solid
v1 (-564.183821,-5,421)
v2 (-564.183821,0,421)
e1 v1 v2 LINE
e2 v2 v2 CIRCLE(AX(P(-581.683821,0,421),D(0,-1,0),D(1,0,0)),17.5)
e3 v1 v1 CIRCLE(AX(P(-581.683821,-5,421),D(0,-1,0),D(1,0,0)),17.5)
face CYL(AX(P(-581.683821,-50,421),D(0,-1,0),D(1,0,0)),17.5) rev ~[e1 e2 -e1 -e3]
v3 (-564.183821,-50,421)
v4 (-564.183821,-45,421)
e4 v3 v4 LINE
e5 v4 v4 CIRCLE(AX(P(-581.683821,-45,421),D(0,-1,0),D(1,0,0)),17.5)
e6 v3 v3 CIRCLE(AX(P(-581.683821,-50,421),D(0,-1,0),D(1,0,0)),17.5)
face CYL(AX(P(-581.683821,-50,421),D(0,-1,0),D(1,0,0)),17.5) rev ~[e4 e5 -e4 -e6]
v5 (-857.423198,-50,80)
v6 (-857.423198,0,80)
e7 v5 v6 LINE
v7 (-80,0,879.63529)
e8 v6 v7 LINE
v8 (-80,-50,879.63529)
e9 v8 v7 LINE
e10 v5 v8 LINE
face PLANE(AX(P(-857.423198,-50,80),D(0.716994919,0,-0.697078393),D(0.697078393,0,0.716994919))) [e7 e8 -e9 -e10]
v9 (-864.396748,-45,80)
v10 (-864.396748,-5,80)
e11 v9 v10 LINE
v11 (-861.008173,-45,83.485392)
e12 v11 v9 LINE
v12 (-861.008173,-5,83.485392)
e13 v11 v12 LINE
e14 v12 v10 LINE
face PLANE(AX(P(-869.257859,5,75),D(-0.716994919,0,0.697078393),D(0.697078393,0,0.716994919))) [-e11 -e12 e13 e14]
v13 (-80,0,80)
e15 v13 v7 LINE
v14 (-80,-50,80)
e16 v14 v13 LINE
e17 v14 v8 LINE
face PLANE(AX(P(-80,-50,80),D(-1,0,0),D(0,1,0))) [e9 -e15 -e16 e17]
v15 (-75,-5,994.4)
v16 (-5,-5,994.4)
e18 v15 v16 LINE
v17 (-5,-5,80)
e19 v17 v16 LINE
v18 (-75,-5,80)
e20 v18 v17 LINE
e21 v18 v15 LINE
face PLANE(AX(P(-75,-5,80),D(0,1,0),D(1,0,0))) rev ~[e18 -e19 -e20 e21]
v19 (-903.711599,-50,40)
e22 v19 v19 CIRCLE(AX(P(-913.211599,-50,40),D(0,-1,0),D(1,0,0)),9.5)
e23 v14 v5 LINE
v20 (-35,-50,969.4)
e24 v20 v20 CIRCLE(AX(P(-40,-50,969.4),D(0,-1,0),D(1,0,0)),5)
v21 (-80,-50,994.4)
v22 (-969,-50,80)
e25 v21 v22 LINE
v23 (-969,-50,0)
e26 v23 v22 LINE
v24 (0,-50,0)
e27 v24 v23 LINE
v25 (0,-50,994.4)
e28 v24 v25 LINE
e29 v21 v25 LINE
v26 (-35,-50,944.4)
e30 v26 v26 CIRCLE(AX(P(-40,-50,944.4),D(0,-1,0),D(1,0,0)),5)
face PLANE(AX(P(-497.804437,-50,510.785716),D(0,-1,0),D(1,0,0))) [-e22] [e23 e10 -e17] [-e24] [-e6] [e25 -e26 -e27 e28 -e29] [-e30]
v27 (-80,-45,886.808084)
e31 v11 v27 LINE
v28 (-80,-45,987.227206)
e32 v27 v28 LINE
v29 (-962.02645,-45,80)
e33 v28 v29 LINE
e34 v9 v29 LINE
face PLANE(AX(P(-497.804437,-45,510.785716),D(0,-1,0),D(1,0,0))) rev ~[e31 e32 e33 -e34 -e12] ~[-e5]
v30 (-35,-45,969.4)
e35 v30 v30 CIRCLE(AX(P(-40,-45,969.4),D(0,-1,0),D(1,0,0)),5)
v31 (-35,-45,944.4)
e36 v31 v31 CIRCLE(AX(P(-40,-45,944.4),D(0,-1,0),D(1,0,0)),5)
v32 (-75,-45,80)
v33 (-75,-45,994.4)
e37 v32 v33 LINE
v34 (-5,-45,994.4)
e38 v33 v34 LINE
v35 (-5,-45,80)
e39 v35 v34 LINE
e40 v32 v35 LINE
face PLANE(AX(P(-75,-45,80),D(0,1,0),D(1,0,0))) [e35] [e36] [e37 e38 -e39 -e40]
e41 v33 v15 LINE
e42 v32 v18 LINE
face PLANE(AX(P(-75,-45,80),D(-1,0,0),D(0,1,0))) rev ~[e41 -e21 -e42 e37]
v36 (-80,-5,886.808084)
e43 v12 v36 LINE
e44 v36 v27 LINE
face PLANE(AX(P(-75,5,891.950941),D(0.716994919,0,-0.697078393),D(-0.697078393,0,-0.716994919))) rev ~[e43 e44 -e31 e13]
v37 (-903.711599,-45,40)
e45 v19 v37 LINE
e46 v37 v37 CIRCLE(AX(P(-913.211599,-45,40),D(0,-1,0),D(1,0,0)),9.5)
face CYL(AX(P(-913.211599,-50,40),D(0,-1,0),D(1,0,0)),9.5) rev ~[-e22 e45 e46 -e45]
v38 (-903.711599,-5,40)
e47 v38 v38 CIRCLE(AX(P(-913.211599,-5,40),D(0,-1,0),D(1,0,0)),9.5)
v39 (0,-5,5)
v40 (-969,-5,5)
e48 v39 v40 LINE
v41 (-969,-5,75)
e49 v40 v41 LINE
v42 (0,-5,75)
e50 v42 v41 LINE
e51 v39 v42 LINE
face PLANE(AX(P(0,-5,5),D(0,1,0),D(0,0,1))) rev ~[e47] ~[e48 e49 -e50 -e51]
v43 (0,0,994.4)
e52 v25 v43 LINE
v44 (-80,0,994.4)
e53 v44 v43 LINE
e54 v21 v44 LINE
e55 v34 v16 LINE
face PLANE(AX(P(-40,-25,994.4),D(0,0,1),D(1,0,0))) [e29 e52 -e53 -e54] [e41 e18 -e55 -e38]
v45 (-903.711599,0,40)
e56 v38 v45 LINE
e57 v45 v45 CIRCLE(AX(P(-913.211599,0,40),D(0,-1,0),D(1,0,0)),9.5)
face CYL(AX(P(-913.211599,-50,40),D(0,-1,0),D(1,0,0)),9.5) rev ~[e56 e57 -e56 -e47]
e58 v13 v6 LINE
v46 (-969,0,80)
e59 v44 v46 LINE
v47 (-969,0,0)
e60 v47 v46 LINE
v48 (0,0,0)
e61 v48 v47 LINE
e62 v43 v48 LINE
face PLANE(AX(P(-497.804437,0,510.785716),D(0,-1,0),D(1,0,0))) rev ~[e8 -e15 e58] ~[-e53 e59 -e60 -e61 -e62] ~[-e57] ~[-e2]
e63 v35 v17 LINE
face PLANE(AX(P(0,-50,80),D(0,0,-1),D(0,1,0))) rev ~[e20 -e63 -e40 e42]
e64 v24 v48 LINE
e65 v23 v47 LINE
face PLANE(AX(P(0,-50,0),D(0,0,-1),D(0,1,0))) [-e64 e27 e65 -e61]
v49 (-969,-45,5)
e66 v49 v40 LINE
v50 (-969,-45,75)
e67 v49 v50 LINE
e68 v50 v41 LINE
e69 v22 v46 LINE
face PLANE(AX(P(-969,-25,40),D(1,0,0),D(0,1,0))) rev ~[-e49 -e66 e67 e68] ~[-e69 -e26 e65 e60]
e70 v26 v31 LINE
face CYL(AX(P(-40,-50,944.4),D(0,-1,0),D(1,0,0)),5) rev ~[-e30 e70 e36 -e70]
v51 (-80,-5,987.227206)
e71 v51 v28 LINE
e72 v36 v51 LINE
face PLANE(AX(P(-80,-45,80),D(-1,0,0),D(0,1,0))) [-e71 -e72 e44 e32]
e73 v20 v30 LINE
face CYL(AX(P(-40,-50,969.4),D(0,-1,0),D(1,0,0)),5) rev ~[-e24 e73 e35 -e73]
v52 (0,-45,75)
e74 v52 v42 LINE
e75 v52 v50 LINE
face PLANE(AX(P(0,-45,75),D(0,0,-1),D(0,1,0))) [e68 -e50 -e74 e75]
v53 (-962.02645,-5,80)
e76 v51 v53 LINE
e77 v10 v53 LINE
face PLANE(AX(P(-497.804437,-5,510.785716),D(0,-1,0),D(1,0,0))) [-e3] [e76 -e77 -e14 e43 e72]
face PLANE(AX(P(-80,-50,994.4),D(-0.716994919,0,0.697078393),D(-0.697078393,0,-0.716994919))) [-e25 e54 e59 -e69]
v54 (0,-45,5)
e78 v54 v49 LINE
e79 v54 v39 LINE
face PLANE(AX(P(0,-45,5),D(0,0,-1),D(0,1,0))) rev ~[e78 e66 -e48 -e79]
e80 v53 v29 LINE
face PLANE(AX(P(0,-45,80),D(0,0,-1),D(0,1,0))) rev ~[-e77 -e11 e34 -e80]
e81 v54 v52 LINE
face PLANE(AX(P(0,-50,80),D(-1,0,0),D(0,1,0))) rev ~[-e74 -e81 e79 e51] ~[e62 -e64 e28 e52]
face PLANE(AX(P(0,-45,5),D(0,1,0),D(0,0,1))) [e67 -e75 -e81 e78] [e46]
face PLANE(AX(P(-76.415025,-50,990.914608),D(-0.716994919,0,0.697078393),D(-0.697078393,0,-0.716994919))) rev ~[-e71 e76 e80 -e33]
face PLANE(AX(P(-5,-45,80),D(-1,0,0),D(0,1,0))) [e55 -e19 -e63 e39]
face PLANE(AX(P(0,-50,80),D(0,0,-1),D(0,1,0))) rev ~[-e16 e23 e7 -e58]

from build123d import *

# Parameters (mm, degrees)
F0_W         = 50
F0_H         = 80
F0_W_2       = 40
F0_H_2       = 70
F1_DEPTH     = 969
F2_W         = 80
F2_H         = 50
F2_W_2       = 70
F2_H_2       = 40
F3_DEPTH     = 914.4
F5_DEPTH     = 50
F6_R         = 17.5
F6_R_2       = 9.5
F7_DEPTH     = 50.001
F8_T         = 5
F8_T3_DEPTH  = 60
F8_T5_DEPTH  = 979
F8_T7_DEPTH  = 924.4
F8_T9_DEPTH  = 80
F8_T11_DEPTH = 50
F6_R_3       = 5
F9_DEPTH     = 5


# Not quite as in the source:
# - a shell that OpenCascade refuses in one call is made with other operations: the cavity is built on its own and cut out
# - a feature names something its author has since deleted; it is built from what else it names


with BuildPart() as f1:
    # F0 (on Right) → F1 (new body)
    with BuildSketch(Plane.YZ):
        with Locations((-25, 40)):
            Rectangle(F0_W, F0_H)
        with Locations((-25, 40)):
            Rectangle(F0_W_2, F0_H_2, mode=Mode.SUBTRACT)
    extrude(amount=-F1_DEPTH)

    # F2 (on face) → F3 (join)
    with BuildSketch(Plane.XY.offset(80)):
        with Locations((-40, -25)):
            Rectangle(F2_W, F2_H)
        with Locations((-40, -25)):
            Rectangle(F2_W_2, F2_H_2, mode=Mode.SUBTRACT)
    extrude(amount=F3_DEPTH)

    # F4 (on face) → F5 (join)
    with BuildSketch(Plane.XZ.offset(50)):
        Polygon((-80, 994.4), (-969, 80), (-857.4231981277, 80), (-80, 879.6352895028), align=None)
    extrude(amount=-F5_DEPTH)

    # F6 (on face) → F7 (cut, through all)
    with BuildSketch(Plane.XZ.offset(50)):
        with Locations((-581.6838212861, 421)):
            Circle(F6_R)
        with Locations((-913.2115990639, 40)):
            Circle(F6_R_2)
    extrude(amount=-F7_DEPTH, mode=Mode.SUBTRACT)

    # F8: shell of thickness 5, made by hand


with BuildPart() as f8_core1:
    # F8_t2: copy of F1
    add(f1.part)

    # the walls: a layer under each face that stays
    f8_faces = [f8_core1.faces().sort_by_distance(p)[0] for p in [
        (-484.5, -25, 0),
        (-484.5, -50, 497.2),
        (-484.5, 0, 497.2),
        (0, -25, 497.2),
        (-969, -46.4285714286, 5.7142857143),
        (-524.5, -25, 537.2),
        (-74.2857142857, -46.4285714286, 994.4),
        (-922.7115990639, -47.5, 40),
        (-468.7115990639, -25, 80),
        (-80, -25, 479.8176447514),
        (-468.7115990639, -25, 479.8176447514),
        (-922.7115990639, -2.5, 40),
        (-484.5, -25, 75),
        (-484.5, -5, 40),
        (-484.5, -25, 5),
        (-484.5, -45, 40),
        (-40, -5, 537.2),
        (-5, -25, 537.2),
        (-40, -45, 537.2),
        (-75, -25, 537.2),
        (-40, -25, 80),
    ]]
    thicken(f8_faces, amount=-F8_T, mode=Mode.SUBTRACT)

    # F8_s4 → F8_t3 (cut)
    with BuildSketch(Plane.XZ.offset(-5)):
        Polygon((-80.05, 80.05), (-80, 75), (-75, 75), (-75, 80), align=None)
        Polygon((-857.3873483818, 80.0151460803), (-857.4231981277, 75), (-869.2578593558, 75), (-861.0081727218, 83.4853919665), align=None)
        Polygon((-80.0141502541, 879.6004355831), (-75, 879.6352895028), (-75, 891.9509410517), (-83.5849745941, 883.1206814692), align=None)
    extrude(amount=F8_T3_DEPTH, mode=Mode.SUBTRACT)

    # F8_s6 → F8_t5 (cut)
    with BuildSketch(Plane.YZ.offset(-974)):
        Polygon((-44.95, 74.95), (-45, 80), (-50, 80), (-50, 75), align=None)
        Polygon((-5.05, 74.95), (-5, 80), (0, 80), (0, 75), align=None)
        Polygon((-5.05, 5.05), (0, 5), (0, 0), (-5, 0), align=None)
        Polygon((-44.95, 5.05), (-45, 0), (-50, 0), (-50, 5), align=None)
    extrude(amount=F8_T5_DEPTH, mode=Mode.SUBTRACT)

    # F8_s8 → F8_t7 (cut)
    with BuildSketch(Plane.XY.offset(75)):
        Polygon((-74.95, -5.05), (-75, 0), (-80, 0), (-80, -5), align=None)
        Polygon((-5.05, -5.05), (-5, 0), (0, 0), (0, -5), align=None)
        Polygon((-5.05, -44.95), (0, -45), (0, -50), (-5, -50), align=None)
        Polygon((-74.95, -44.95), (-75, -50), (-80, -50), (-80, -45), align=None)
    extrude(amount=F8_T7_DEPTH, mode=Mode.SUBTRACT)

    # F8_s10 → F8_t9 (cut)
    with BuildSketch(Plane.YZ.offset(-80)):
        Polygon((-5.05, 80.05), (0, 80), (0, 75), (-5, 75), align=None)
        Polygon((-44.95, 80.05), (-50, 80), (-50, 75), (-45, 75), align=None)
    extrude(amount=F8_T9_DEPTH, mode=Mode.SUBTRACT)

    # F8_s12 → F8_t11 (cut)
    with BuildSketch(Plane.XZ):
        Polygon((-5.05, 80.05), (0, 80), (0, 75), (-5, 75), align=None)
        Polygon((-74.95, 80.05), (-80, 80), (-80, 75), (-75, 75), align=None)
    extrude(amount=F8_T11_DEPTH, mode=Mode.SUBTRACT)


with BuildPart() as f1_1:
    add(f1.part)

    # what is left inside the walls is the cavity
    f8_cavity = [f8_core1.part.solids().sort_by_distance(p)[0] for p in [
        (-635.349987, -5.05, 363.508502),
    ]]
    add(f8_cavity, mode=Mode.SUBTRACT)

    # F6 (on face) → F9 (cut, through all)
    with BuildSketch(Plane.XZ.offset(50)):
        with Locations((-40, 969.4)):
            Circle(F6_R_3)
        with Locations((-40, 944.4)):
            Circle(F6_R_3)
    extrude(amount=-F9_DEPTH, mode=Mode.SUBTRACT)


solid = f1_1.part
